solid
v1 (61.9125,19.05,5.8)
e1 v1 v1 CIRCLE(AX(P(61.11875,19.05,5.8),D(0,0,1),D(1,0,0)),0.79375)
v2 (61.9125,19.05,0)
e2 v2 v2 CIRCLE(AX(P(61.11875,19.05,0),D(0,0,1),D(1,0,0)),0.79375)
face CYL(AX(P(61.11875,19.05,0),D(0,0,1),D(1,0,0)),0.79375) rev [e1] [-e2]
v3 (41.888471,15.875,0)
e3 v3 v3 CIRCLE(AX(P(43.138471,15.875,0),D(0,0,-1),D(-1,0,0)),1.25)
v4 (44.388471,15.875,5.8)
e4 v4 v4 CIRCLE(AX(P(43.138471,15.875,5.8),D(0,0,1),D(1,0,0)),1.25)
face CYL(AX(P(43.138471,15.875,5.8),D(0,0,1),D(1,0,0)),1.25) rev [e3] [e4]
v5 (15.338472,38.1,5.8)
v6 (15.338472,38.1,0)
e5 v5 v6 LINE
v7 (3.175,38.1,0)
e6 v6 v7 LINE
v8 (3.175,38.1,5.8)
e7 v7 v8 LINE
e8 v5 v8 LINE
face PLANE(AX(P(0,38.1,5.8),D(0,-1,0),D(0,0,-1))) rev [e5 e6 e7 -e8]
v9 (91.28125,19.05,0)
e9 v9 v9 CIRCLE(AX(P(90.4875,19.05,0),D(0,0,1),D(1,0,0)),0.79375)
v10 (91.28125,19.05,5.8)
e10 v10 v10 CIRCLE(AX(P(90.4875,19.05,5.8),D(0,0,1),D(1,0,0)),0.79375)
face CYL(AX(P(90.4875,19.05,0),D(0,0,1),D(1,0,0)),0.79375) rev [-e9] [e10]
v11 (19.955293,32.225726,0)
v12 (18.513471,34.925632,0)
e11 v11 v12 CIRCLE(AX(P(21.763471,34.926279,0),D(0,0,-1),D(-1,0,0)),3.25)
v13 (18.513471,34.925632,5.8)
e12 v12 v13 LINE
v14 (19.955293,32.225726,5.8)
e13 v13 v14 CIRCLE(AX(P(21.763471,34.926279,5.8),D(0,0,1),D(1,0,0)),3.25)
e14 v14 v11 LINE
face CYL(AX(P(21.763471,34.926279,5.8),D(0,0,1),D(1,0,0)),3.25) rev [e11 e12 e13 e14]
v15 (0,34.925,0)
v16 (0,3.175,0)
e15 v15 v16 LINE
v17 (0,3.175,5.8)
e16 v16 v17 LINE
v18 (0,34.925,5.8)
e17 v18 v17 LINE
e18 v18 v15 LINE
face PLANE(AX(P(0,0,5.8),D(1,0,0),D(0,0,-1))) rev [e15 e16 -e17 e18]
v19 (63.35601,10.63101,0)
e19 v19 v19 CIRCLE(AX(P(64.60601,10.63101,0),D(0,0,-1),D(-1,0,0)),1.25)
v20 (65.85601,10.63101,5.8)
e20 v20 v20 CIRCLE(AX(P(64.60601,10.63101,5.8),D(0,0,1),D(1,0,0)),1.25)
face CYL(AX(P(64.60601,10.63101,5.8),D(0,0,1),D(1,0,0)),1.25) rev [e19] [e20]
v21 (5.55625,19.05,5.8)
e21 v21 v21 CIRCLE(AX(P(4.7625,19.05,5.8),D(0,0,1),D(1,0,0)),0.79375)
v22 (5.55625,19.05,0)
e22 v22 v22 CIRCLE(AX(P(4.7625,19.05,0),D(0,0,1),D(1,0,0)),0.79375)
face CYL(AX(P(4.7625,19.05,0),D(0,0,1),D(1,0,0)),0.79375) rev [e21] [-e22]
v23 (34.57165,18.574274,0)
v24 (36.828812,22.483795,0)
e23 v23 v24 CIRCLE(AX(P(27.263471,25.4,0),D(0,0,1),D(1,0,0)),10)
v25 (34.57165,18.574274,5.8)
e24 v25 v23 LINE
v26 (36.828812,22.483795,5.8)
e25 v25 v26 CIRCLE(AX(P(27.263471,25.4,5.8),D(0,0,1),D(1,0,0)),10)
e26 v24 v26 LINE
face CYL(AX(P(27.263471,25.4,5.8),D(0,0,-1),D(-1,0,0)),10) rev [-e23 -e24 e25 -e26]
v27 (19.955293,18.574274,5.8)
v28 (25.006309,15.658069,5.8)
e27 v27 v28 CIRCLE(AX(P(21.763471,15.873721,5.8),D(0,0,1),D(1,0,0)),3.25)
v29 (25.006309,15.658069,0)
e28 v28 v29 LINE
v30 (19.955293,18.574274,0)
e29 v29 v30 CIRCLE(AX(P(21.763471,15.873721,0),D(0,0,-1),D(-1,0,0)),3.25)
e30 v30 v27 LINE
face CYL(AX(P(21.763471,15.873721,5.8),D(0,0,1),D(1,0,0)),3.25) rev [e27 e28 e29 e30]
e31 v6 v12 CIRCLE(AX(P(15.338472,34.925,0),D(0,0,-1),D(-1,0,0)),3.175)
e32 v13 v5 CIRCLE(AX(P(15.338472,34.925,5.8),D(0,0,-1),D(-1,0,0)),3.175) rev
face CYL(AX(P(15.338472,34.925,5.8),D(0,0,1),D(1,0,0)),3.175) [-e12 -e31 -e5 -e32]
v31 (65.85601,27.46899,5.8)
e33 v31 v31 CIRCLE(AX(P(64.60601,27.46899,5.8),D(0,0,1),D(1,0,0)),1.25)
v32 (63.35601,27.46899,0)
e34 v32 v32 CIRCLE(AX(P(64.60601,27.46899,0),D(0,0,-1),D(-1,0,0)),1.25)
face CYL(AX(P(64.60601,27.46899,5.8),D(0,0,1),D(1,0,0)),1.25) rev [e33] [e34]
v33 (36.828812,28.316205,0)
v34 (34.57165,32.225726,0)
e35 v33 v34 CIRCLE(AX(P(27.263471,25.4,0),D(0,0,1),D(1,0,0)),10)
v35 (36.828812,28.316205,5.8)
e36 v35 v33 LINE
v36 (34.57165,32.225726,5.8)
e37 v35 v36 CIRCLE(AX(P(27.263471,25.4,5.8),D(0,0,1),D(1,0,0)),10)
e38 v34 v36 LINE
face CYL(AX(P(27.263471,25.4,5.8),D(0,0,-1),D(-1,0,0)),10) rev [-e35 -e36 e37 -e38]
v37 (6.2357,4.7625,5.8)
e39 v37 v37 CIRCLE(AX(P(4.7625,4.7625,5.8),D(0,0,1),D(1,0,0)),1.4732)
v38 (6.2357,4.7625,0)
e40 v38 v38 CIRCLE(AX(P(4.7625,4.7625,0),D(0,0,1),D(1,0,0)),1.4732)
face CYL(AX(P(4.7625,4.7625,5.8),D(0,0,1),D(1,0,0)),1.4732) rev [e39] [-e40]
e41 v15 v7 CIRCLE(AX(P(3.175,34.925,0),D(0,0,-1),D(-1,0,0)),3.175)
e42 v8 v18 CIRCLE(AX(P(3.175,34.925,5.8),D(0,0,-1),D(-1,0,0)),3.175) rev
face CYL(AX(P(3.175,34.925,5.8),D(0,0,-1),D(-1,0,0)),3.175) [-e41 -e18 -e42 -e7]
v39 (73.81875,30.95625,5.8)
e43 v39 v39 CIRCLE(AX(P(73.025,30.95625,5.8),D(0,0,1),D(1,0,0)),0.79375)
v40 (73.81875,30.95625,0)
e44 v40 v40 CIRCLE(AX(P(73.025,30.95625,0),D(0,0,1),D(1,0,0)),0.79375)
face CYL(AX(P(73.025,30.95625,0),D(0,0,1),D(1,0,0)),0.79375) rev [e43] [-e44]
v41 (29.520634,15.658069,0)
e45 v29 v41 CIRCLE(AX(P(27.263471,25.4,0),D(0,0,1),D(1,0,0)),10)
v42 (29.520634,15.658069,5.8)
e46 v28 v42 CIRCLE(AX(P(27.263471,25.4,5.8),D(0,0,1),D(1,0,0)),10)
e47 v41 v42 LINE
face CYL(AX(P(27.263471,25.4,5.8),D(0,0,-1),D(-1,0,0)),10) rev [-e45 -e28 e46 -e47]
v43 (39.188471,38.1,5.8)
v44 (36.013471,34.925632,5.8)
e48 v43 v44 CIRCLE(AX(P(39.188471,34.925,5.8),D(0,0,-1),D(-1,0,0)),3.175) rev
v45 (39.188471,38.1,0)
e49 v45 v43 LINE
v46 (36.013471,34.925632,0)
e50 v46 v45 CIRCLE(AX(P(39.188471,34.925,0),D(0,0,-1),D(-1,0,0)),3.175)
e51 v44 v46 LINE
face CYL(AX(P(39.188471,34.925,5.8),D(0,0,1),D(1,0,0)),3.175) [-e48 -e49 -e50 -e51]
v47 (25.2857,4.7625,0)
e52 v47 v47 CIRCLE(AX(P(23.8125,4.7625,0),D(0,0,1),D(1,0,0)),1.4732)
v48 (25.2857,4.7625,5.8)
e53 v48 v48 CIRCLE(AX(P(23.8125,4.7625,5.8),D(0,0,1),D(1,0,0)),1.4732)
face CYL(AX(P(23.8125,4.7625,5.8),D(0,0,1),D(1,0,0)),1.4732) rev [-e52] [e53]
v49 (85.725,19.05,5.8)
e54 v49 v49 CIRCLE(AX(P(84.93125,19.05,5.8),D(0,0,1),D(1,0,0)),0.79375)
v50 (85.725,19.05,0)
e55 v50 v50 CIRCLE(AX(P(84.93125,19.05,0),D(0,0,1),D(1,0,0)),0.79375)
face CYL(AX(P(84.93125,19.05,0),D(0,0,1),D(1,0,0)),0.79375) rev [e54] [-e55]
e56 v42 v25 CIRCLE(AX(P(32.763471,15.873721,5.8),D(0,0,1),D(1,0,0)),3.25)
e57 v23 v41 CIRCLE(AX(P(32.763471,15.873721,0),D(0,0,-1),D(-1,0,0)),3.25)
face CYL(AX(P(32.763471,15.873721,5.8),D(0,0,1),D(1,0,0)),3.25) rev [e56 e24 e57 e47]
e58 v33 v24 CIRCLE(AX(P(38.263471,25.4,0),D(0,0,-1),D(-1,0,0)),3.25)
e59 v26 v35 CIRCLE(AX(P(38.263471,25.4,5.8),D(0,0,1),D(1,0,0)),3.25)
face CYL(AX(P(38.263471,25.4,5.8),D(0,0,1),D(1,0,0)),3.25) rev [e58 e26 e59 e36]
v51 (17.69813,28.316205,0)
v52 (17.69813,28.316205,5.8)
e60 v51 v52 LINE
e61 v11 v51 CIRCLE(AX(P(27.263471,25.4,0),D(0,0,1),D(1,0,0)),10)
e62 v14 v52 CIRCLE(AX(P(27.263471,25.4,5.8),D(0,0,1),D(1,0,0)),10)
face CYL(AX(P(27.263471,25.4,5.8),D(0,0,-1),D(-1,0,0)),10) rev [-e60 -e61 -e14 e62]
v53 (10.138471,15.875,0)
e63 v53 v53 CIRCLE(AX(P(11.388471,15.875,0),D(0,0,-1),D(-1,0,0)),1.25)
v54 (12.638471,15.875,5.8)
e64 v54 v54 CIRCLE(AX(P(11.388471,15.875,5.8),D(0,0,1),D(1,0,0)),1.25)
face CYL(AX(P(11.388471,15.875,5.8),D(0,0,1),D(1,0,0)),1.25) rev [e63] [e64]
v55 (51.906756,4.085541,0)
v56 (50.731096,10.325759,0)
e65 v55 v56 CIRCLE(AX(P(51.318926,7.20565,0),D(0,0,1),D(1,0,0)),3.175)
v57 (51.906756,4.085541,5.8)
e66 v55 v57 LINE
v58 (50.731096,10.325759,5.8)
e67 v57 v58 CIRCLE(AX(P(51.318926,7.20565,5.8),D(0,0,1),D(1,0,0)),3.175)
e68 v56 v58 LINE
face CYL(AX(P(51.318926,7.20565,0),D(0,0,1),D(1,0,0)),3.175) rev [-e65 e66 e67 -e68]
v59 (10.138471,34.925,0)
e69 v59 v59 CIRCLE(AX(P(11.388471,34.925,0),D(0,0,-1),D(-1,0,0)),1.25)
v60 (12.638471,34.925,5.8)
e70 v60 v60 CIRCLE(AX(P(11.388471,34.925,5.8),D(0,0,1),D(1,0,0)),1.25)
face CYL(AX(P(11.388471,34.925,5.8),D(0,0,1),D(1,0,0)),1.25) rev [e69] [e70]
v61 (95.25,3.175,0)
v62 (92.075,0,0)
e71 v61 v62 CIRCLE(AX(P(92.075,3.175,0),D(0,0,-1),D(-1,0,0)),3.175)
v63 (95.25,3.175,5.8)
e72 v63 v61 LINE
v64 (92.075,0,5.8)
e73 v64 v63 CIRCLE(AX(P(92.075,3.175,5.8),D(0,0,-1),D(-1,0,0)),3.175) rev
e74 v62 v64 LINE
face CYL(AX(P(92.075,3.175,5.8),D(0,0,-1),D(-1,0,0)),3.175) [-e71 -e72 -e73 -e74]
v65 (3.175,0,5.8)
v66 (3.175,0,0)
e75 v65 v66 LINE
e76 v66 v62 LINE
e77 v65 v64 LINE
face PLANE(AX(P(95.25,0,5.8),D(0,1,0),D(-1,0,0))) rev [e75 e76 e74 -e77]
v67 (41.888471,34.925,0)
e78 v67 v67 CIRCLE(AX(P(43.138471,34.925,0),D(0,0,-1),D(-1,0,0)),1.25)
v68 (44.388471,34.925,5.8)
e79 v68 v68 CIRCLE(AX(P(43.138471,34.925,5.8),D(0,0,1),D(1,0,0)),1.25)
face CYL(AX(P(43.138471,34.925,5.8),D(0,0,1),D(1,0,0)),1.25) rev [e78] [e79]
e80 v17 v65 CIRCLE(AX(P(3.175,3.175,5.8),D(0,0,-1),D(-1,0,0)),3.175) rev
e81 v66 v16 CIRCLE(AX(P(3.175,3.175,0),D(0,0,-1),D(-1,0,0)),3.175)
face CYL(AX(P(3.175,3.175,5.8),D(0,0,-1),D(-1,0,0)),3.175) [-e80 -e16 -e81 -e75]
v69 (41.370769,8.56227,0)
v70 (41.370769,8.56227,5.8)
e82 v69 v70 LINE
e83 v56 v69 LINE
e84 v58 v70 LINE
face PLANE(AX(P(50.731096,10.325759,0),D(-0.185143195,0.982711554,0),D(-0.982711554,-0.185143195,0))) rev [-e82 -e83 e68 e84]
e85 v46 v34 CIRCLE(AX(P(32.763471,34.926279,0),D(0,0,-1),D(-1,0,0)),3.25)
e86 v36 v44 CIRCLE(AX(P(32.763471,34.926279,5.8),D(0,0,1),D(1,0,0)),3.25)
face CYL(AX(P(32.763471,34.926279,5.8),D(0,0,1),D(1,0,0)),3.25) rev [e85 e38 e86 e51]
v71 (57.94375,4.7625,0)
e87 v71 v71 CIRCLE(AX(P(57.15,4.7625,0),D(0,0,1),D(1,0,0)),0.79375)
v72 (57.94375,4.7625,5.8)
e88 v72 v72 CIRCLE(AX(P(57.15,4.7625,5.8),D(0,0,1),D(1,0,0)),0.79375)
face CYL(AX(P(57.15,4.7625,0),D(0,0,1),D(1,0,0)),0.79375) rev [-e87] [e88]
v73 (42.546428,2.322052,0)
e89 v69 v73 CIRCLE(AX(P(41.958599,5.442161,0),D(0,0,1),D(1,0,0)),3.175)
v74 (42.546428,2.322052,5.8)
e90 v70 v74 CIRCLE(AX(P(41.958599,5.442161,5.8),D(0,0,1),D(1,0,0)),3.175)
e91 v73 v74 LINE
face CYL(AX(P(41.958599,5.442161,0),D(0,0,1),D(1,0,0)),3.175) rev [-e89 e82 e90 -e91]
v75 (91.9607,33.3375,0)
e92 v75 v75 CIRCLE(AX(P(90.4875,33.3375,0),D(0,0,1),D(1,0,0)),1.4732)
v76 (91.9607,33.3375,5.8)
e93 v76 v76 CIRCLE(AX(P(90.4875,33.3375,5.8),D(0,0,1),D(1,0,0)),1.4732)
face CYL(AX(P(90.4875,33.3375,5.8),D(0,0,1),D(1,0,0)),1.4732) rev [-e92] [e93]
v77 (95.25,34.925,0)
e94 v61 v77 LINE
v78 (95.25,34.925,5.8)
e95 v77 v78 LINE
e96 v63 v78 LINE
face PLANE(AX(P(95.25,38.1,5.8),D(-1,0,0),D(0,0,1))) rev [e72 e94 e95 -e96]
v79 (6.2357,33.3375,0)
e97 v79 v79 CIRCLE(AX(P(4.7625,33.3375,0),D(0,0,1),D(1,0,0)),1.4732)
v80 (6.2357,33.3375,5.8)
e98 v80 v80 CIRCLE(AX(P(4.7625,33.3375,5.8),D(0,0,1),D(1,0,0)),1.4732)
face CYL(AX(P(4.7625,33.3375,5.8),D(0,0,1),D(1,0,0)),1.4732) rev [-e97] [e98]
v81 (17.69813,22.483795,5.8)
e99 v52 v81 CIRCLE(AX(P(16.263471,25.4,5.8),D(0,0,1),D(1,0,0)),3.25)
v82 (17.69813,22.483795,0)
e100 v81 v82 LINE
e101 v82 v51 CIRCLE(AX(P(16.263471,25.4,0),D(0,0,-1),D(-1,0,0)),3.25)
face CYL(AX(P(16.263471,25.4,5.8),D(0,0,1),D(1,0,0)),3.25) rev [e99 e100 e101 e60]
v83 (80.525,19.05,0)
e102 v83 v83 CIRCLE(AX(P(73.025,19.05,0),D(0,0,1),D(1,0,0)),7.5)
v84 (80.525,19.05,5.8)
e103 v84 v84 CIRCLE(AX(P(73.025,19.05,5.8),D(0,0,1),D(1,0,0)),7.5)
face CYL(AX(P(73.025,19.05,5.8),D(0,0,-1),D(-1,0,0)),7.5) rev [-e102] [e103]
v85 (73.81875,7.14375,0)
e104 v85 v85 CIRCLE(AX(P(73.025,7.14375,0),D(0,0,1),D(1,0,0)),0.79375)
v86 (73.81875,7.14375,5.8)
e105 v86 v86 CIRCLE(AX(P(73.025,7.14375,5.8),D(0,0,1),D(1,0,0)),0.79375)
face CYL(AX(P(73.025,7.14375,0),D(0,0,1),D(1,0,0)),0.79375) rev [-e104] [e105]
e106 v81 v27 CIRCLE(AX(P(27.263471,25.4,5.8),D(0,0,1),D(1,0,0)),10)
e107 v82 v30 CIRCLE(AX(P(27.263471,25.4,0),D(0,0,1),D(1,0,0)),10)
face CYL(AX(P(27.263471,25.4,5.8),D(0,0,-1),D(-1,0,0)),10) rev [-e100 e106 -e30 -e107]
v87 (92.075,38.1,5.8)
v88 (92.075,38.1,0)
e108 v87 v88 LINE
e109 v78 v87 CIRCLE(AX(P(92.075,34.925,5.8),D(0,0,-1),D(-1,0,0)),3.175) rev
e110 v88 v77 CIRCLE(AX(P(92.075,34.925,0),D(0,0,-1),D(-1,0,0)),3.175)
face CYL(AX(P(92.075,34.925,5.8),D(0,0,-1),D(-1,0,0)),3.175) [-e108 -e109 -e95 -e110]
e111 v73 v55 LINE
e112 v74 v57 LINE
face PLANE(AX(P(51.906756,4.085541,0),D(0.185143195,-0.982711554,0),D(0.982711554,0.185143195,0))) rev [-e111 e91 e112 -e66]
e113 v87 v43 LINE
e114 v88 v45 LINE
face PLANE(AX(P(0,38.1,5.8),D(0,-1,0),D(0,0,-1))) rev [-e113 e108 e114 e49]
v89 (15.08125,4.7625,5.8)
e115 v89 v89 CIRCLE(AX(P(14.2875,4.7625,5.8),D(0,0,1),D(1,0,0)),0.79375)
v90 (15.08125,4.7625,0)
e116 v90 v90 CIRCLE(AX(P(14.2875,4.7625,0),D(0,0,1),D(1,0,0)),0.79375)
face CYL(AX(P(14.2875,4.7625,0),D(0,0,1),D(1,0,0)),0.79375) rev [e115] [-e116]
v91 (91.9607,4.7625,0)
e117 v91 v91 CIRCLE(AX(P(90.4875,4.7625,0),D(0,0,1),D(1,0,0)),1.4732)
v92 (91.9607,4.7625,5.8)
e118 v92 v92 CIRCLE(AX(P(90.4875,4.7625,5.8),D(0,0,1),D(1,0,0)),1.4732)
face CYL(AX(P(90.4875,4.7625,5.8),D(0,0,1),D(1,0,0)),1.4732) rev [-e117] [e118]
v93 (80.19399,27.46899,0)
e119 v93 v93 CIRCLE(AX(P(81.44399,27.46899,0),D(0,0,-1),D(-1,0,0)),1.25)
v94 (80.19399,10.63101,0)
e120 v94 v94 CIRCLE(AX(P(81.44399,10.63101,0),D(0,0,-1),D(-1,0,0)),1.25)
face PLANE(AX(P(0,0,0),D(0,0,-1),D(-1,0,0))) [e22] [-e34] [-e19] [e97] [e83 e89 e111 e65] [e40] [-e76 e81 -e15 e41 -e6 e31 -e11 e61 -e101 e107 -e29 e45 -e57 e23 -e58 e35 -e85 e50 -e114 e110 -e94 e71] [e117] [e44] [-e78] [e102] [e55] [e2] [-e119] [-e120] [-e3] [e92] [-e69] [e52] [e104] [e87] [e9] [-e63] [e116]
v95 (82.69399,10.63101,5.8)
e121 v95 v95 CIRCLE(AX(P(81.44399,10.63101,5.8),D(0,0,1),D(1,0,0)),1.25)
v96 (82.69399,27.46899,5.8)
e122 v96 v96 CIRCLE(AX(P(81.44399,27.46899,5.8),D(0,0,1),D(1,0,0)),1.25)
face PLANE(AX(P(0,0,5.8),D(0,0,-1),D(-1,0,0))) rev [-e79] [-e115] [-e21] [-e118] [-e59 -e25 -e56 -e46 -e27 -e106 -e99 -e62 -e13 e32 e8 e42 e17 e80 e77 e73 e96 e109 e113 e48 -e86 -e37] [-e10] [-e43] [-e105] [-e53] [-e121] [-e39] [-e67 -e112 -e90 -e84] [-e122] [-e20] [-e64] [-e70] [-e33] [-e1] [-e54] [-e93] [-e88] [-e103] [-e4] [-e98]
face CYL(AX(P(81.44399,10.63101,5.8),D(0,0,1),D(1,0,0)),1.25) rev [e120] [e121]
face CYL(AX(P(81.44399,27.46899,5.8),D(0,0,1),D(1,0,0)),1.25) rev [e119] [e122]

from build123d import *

# Parameters (mm, degrees)
SKETCH1_W                 = 95.25
SKETCH1_H                 = 38.1
SKETCH1_R                 = 7.5
SKETCH1_R_2               = 10
BOSS_EXTRUDE1_DEPTH       = 5.8
CBORE_FOR_M3_SHCS1_DEPTH  = 5.8
CUT_EXTRUDE1_DEPTH        = 103.751216538
FILLET1_R                 = 3.175
F_4_CLEARANCE_HOLE1_D     = 2.9464
F_4_CLEARANCE_HOLE1_DEPTH = 5.8
F_4_CLEARANCE_HOLE1_TIP   = 0.885187864
SKETCH11_R                = 0.79375
CUT_EXTRUDE2_DEPTH        = 103.751216538
FILLET2_R                 = 3.175
M3X0_5_TAPPED_HOLE1_D     = 2.5
M3X0_5_TAPPED_HOLE1_DEPTH = 7.5
M3X0_5_TAPPED_HOLE1_TIP   = 0.751075774
M3X0_5_TAPPED_HOLE2_D     = 2.5
M3X0_5_TAPPED_HOLE2_DEPTH = 8.5
M3X0_5_TAPPED_HOLE2_TIP   = 0.751075774
SKETCH17_R                = 0.79375
CUT_EXTRUDE3_DEPTH        = 103.751216538


# Read off the part's stored shape, not the designer's step: CBORE for M3 SHCS1
with BuildPart() as part:
    # Sketch1 → Boss-Extrude1 (new body)
    with BuildSketch(Plane.XY):
        with Locations((47.625, 19.05)):
            Rectangle(SKETCH1_W, SKETCH1_H)
        with Locations((73.025, 19.05)):
            Circle(SKETCH1_R, mode=Mode.SUBTRACT)
        with Locations((27.263471398, 25.4)):
            Circle(SKETCH1_R_2, mode=Mode.SUBTRACT)
    extrude(amount=BOSS_EXTRUDE1_DEPTH)

    # CBORE for M3 SHCS1 outline → CBORE for M3 SHCS1 (cut)
    with BuildSketch(Plane.XY):
        with BuildLine():
            ThreePointArc((34.571649716, 18.574274422), (32.263471398, 16.739745962), (29.520633989, 15.658069132))
            ThreePointArc((29.520633989, 15.658069132), (34.388471398, 13.059137996), (34.571649716, 18.574274422))
        make_face()
        with BuildLine():
            ThreePointArc((19.95529308, 18.574274422), (20.138471398, 13.059137996), (25.006308807, 15.658069132))
            ThreePointArc((25.006308807, 15.658069132), (22.263471398, 16.739745962), (19.95529308, 18.574274422))
        make_face()
        with BuildLine():
            ThreePointArc((36.828812307, 28.31620529), (37.263471398, 25.4), (36.828812307, 22.48379471))
            ThreePointArc((36.828812307, 22.48379471), (41.513471398, 25.4), (36.828812307, 28.31620529))
        make_face()
        with BuildLine():
            ThreePointArc((17.698130489, 28.31620529), (13.013471398, 25.4), (17.698130489, 22.48379471))
            ThreePointArc((17.698130489, 22.48379471), (17.263471398, 25.4), (17.698130489, 28.31620529))
        make_face()
        with BuildLine():
            ThreePointArc((19.95529308, 32.225725578), (27.263471398, 35.4), (34.571649716, 32.225725578))
            ThreePointArc((34.571649716, 32.225725578), (35.957138985, 35.528763749), (33.463469839, 38.1))
            Line((33.463469839, 38.1), (21.063472957, 38.1))
            ThreePointArc((21.063472957, 38.1), (18.56980381, 35.528763749), (19.95529308, 32.225725578))
        make_face()
    extrude(amount=CBORE_FOR_M3_SHCS1_DEPTH, mode=Mode.SUBTRACT)

    # Sketch3 → Cut-Extrude1 (cut, through all)
    with BuildSketch(Plane.XY.offset(5.8)):
        with BuildLine():
            Line((50.731096487, 10.325758959), (41.37076894, 8.562270029))
            ThreePointArc((41.37076894, 8.562270029), (38.838489401, 4.854331203), (42.546428227, 2.322051664))
            Line((42.546428227, 2.322051664), (51.906755774, 4.085540594))
            ThreePointArc((51.906755774, 4.085540594), (54.439035313, 7.79347942), (50.731096487, 10.325758959))
        make_face()
    extrude(amount=-CUT_EXTRUDE1_DEPTH, mode=Mode.SUBTRACT)

    # Fillet1
    fillet1_edges = [part.edges().sort_by_distance(p)[0] for p in [
        (0, 0, 2.9),
        (0, 38.1, 2.9),
        (95.25, 38.1, 2.9),
        (95.25, 0, 2.9),
    ]]
    fillet(fillet1_edges, radius=FILLET1_R)

    # #4 Clearance Hole1
    with Locations(Plane.XY.offset(5.8)):
        with Locations((4.7625, 33.3375), (4.7625, 4.7625), (23.8125, 4.7625), (90.4875, 4.7625), (90.4875, 33.3375)):
            Hole(F_4_CLEARANCE_HOLE1_D / 2, depth=F_4_CLEARANCE_HOLE1_DEPTH)
            with Locations((0, 0, -(F_4_CLEARANCE_HOLE1_DEPTH + F_4_CLEARANCE_HOLE1_TIP / 2))):  # 118° drill point
                Cone(0, F_4_CLEARANCE_HOLE1_D / 2, F_4_CLEARANCE_HOLE1_TIP, mode=Mode.SUBTRACT)

    # Sketch11 → Cut-Extrude2 (cut, through all)
    with BuildSketch(Plane.XY.offset(5.8)):
        with Locations((4.7625, 19.05)):
            Circle(SKETCH11_R)
        with Locations((14.2875, 4.7625)):
            Circle(SKETCH11_R)
        with Locations((57.15, 4.7625)):
            Circle(SKETCH11_R)
        with Locations((90.4875, 19.05)):
            Circle(SKETCH11_R)
    extrude(amount=-CUT_EXTRUDE2_DEPTH, mode=Mode.SUBTRACT)

    # Fillet2
    fillet2_edges = [part.edges().sort_by_distance(p)[0] for p in [
        (33.463469839, 38.1, 2.9),
        (21.063472957, 38.1, 2.9),
    ]]
    fillet(fillet2_edges, radius=FILLET2_R)

    # M3x0.5 Tapped Hole1
    with Locations(Plane.XY.offset(5.8)):
        with Locations((11.388471398, 34.925), (43.138471398, 34.925), (43.138471398, 15.875), (11.388471398, 15.875)):
            Hole(M3X0_5_TAPPED_HOLE1_D / 2, depth=M3X0_5_TAPPED_HOLE1_DEPTH)
            with Locations((0, 0, -(M3X0_5_TAPPED_HOLE1_DEPTH + M3X0_5_TAPPED_HOLE1_TIP / 2))):  # 118° drill point
                Cone(0, M3X0_5_TAPPED_HOLE1_D / 2, M3X0_5_TAPPED_HOLE1_TIP, mode=Mode.SUBTRACT)

    # M3x0.5 Tapped Hole2
    with Locations(Plane.XY.offset(5.8)):
        with Locations((64.606009886, 27.468990114), (81.443990114, 27.468990114), (81.443990114, 10.631009886), (64.606009886, 10.631009886)):
            Hole(M3X0_5_TAPPED_HOLE2_D / 2, depth=M3X0_5_TAPPED_HOLE2_DEPTH)
            with Locations((0, 0, -(M3X0_5_TAPPED_HOLE2_DEPTH + M3X0_5_TAPPED_HOLE2_TIP / 2))):  # 118° drill point
                Cone(0, M3X0_5_TAPPED_HOLE2_D / 2, M3X0_5_TAPPED_HOLE2_TIP, mode=Mode.SUBTRACT)

    # Sketch17 → Cut-Extrude3 (cut, through all)
    with BuildSketch(Plane.XY.offset(5.8)):
        with Locations((61.11875, 19.05)):
            Circle(SKETCH17_R)
        with Locations((73.025, 7.14375)):
            Circle(SKETCH17_R)
        with Locations((84.93125, 19.05)):
            Circle(SKETCH17_R)
        with Locations((73.025, 30.95625)):
            Circle(SKETCH17_R)
    extrude(amount=-CUT_EXTRUDE3_DEPTH, mode=Mode.SUBTRACT)


solid = part.part
